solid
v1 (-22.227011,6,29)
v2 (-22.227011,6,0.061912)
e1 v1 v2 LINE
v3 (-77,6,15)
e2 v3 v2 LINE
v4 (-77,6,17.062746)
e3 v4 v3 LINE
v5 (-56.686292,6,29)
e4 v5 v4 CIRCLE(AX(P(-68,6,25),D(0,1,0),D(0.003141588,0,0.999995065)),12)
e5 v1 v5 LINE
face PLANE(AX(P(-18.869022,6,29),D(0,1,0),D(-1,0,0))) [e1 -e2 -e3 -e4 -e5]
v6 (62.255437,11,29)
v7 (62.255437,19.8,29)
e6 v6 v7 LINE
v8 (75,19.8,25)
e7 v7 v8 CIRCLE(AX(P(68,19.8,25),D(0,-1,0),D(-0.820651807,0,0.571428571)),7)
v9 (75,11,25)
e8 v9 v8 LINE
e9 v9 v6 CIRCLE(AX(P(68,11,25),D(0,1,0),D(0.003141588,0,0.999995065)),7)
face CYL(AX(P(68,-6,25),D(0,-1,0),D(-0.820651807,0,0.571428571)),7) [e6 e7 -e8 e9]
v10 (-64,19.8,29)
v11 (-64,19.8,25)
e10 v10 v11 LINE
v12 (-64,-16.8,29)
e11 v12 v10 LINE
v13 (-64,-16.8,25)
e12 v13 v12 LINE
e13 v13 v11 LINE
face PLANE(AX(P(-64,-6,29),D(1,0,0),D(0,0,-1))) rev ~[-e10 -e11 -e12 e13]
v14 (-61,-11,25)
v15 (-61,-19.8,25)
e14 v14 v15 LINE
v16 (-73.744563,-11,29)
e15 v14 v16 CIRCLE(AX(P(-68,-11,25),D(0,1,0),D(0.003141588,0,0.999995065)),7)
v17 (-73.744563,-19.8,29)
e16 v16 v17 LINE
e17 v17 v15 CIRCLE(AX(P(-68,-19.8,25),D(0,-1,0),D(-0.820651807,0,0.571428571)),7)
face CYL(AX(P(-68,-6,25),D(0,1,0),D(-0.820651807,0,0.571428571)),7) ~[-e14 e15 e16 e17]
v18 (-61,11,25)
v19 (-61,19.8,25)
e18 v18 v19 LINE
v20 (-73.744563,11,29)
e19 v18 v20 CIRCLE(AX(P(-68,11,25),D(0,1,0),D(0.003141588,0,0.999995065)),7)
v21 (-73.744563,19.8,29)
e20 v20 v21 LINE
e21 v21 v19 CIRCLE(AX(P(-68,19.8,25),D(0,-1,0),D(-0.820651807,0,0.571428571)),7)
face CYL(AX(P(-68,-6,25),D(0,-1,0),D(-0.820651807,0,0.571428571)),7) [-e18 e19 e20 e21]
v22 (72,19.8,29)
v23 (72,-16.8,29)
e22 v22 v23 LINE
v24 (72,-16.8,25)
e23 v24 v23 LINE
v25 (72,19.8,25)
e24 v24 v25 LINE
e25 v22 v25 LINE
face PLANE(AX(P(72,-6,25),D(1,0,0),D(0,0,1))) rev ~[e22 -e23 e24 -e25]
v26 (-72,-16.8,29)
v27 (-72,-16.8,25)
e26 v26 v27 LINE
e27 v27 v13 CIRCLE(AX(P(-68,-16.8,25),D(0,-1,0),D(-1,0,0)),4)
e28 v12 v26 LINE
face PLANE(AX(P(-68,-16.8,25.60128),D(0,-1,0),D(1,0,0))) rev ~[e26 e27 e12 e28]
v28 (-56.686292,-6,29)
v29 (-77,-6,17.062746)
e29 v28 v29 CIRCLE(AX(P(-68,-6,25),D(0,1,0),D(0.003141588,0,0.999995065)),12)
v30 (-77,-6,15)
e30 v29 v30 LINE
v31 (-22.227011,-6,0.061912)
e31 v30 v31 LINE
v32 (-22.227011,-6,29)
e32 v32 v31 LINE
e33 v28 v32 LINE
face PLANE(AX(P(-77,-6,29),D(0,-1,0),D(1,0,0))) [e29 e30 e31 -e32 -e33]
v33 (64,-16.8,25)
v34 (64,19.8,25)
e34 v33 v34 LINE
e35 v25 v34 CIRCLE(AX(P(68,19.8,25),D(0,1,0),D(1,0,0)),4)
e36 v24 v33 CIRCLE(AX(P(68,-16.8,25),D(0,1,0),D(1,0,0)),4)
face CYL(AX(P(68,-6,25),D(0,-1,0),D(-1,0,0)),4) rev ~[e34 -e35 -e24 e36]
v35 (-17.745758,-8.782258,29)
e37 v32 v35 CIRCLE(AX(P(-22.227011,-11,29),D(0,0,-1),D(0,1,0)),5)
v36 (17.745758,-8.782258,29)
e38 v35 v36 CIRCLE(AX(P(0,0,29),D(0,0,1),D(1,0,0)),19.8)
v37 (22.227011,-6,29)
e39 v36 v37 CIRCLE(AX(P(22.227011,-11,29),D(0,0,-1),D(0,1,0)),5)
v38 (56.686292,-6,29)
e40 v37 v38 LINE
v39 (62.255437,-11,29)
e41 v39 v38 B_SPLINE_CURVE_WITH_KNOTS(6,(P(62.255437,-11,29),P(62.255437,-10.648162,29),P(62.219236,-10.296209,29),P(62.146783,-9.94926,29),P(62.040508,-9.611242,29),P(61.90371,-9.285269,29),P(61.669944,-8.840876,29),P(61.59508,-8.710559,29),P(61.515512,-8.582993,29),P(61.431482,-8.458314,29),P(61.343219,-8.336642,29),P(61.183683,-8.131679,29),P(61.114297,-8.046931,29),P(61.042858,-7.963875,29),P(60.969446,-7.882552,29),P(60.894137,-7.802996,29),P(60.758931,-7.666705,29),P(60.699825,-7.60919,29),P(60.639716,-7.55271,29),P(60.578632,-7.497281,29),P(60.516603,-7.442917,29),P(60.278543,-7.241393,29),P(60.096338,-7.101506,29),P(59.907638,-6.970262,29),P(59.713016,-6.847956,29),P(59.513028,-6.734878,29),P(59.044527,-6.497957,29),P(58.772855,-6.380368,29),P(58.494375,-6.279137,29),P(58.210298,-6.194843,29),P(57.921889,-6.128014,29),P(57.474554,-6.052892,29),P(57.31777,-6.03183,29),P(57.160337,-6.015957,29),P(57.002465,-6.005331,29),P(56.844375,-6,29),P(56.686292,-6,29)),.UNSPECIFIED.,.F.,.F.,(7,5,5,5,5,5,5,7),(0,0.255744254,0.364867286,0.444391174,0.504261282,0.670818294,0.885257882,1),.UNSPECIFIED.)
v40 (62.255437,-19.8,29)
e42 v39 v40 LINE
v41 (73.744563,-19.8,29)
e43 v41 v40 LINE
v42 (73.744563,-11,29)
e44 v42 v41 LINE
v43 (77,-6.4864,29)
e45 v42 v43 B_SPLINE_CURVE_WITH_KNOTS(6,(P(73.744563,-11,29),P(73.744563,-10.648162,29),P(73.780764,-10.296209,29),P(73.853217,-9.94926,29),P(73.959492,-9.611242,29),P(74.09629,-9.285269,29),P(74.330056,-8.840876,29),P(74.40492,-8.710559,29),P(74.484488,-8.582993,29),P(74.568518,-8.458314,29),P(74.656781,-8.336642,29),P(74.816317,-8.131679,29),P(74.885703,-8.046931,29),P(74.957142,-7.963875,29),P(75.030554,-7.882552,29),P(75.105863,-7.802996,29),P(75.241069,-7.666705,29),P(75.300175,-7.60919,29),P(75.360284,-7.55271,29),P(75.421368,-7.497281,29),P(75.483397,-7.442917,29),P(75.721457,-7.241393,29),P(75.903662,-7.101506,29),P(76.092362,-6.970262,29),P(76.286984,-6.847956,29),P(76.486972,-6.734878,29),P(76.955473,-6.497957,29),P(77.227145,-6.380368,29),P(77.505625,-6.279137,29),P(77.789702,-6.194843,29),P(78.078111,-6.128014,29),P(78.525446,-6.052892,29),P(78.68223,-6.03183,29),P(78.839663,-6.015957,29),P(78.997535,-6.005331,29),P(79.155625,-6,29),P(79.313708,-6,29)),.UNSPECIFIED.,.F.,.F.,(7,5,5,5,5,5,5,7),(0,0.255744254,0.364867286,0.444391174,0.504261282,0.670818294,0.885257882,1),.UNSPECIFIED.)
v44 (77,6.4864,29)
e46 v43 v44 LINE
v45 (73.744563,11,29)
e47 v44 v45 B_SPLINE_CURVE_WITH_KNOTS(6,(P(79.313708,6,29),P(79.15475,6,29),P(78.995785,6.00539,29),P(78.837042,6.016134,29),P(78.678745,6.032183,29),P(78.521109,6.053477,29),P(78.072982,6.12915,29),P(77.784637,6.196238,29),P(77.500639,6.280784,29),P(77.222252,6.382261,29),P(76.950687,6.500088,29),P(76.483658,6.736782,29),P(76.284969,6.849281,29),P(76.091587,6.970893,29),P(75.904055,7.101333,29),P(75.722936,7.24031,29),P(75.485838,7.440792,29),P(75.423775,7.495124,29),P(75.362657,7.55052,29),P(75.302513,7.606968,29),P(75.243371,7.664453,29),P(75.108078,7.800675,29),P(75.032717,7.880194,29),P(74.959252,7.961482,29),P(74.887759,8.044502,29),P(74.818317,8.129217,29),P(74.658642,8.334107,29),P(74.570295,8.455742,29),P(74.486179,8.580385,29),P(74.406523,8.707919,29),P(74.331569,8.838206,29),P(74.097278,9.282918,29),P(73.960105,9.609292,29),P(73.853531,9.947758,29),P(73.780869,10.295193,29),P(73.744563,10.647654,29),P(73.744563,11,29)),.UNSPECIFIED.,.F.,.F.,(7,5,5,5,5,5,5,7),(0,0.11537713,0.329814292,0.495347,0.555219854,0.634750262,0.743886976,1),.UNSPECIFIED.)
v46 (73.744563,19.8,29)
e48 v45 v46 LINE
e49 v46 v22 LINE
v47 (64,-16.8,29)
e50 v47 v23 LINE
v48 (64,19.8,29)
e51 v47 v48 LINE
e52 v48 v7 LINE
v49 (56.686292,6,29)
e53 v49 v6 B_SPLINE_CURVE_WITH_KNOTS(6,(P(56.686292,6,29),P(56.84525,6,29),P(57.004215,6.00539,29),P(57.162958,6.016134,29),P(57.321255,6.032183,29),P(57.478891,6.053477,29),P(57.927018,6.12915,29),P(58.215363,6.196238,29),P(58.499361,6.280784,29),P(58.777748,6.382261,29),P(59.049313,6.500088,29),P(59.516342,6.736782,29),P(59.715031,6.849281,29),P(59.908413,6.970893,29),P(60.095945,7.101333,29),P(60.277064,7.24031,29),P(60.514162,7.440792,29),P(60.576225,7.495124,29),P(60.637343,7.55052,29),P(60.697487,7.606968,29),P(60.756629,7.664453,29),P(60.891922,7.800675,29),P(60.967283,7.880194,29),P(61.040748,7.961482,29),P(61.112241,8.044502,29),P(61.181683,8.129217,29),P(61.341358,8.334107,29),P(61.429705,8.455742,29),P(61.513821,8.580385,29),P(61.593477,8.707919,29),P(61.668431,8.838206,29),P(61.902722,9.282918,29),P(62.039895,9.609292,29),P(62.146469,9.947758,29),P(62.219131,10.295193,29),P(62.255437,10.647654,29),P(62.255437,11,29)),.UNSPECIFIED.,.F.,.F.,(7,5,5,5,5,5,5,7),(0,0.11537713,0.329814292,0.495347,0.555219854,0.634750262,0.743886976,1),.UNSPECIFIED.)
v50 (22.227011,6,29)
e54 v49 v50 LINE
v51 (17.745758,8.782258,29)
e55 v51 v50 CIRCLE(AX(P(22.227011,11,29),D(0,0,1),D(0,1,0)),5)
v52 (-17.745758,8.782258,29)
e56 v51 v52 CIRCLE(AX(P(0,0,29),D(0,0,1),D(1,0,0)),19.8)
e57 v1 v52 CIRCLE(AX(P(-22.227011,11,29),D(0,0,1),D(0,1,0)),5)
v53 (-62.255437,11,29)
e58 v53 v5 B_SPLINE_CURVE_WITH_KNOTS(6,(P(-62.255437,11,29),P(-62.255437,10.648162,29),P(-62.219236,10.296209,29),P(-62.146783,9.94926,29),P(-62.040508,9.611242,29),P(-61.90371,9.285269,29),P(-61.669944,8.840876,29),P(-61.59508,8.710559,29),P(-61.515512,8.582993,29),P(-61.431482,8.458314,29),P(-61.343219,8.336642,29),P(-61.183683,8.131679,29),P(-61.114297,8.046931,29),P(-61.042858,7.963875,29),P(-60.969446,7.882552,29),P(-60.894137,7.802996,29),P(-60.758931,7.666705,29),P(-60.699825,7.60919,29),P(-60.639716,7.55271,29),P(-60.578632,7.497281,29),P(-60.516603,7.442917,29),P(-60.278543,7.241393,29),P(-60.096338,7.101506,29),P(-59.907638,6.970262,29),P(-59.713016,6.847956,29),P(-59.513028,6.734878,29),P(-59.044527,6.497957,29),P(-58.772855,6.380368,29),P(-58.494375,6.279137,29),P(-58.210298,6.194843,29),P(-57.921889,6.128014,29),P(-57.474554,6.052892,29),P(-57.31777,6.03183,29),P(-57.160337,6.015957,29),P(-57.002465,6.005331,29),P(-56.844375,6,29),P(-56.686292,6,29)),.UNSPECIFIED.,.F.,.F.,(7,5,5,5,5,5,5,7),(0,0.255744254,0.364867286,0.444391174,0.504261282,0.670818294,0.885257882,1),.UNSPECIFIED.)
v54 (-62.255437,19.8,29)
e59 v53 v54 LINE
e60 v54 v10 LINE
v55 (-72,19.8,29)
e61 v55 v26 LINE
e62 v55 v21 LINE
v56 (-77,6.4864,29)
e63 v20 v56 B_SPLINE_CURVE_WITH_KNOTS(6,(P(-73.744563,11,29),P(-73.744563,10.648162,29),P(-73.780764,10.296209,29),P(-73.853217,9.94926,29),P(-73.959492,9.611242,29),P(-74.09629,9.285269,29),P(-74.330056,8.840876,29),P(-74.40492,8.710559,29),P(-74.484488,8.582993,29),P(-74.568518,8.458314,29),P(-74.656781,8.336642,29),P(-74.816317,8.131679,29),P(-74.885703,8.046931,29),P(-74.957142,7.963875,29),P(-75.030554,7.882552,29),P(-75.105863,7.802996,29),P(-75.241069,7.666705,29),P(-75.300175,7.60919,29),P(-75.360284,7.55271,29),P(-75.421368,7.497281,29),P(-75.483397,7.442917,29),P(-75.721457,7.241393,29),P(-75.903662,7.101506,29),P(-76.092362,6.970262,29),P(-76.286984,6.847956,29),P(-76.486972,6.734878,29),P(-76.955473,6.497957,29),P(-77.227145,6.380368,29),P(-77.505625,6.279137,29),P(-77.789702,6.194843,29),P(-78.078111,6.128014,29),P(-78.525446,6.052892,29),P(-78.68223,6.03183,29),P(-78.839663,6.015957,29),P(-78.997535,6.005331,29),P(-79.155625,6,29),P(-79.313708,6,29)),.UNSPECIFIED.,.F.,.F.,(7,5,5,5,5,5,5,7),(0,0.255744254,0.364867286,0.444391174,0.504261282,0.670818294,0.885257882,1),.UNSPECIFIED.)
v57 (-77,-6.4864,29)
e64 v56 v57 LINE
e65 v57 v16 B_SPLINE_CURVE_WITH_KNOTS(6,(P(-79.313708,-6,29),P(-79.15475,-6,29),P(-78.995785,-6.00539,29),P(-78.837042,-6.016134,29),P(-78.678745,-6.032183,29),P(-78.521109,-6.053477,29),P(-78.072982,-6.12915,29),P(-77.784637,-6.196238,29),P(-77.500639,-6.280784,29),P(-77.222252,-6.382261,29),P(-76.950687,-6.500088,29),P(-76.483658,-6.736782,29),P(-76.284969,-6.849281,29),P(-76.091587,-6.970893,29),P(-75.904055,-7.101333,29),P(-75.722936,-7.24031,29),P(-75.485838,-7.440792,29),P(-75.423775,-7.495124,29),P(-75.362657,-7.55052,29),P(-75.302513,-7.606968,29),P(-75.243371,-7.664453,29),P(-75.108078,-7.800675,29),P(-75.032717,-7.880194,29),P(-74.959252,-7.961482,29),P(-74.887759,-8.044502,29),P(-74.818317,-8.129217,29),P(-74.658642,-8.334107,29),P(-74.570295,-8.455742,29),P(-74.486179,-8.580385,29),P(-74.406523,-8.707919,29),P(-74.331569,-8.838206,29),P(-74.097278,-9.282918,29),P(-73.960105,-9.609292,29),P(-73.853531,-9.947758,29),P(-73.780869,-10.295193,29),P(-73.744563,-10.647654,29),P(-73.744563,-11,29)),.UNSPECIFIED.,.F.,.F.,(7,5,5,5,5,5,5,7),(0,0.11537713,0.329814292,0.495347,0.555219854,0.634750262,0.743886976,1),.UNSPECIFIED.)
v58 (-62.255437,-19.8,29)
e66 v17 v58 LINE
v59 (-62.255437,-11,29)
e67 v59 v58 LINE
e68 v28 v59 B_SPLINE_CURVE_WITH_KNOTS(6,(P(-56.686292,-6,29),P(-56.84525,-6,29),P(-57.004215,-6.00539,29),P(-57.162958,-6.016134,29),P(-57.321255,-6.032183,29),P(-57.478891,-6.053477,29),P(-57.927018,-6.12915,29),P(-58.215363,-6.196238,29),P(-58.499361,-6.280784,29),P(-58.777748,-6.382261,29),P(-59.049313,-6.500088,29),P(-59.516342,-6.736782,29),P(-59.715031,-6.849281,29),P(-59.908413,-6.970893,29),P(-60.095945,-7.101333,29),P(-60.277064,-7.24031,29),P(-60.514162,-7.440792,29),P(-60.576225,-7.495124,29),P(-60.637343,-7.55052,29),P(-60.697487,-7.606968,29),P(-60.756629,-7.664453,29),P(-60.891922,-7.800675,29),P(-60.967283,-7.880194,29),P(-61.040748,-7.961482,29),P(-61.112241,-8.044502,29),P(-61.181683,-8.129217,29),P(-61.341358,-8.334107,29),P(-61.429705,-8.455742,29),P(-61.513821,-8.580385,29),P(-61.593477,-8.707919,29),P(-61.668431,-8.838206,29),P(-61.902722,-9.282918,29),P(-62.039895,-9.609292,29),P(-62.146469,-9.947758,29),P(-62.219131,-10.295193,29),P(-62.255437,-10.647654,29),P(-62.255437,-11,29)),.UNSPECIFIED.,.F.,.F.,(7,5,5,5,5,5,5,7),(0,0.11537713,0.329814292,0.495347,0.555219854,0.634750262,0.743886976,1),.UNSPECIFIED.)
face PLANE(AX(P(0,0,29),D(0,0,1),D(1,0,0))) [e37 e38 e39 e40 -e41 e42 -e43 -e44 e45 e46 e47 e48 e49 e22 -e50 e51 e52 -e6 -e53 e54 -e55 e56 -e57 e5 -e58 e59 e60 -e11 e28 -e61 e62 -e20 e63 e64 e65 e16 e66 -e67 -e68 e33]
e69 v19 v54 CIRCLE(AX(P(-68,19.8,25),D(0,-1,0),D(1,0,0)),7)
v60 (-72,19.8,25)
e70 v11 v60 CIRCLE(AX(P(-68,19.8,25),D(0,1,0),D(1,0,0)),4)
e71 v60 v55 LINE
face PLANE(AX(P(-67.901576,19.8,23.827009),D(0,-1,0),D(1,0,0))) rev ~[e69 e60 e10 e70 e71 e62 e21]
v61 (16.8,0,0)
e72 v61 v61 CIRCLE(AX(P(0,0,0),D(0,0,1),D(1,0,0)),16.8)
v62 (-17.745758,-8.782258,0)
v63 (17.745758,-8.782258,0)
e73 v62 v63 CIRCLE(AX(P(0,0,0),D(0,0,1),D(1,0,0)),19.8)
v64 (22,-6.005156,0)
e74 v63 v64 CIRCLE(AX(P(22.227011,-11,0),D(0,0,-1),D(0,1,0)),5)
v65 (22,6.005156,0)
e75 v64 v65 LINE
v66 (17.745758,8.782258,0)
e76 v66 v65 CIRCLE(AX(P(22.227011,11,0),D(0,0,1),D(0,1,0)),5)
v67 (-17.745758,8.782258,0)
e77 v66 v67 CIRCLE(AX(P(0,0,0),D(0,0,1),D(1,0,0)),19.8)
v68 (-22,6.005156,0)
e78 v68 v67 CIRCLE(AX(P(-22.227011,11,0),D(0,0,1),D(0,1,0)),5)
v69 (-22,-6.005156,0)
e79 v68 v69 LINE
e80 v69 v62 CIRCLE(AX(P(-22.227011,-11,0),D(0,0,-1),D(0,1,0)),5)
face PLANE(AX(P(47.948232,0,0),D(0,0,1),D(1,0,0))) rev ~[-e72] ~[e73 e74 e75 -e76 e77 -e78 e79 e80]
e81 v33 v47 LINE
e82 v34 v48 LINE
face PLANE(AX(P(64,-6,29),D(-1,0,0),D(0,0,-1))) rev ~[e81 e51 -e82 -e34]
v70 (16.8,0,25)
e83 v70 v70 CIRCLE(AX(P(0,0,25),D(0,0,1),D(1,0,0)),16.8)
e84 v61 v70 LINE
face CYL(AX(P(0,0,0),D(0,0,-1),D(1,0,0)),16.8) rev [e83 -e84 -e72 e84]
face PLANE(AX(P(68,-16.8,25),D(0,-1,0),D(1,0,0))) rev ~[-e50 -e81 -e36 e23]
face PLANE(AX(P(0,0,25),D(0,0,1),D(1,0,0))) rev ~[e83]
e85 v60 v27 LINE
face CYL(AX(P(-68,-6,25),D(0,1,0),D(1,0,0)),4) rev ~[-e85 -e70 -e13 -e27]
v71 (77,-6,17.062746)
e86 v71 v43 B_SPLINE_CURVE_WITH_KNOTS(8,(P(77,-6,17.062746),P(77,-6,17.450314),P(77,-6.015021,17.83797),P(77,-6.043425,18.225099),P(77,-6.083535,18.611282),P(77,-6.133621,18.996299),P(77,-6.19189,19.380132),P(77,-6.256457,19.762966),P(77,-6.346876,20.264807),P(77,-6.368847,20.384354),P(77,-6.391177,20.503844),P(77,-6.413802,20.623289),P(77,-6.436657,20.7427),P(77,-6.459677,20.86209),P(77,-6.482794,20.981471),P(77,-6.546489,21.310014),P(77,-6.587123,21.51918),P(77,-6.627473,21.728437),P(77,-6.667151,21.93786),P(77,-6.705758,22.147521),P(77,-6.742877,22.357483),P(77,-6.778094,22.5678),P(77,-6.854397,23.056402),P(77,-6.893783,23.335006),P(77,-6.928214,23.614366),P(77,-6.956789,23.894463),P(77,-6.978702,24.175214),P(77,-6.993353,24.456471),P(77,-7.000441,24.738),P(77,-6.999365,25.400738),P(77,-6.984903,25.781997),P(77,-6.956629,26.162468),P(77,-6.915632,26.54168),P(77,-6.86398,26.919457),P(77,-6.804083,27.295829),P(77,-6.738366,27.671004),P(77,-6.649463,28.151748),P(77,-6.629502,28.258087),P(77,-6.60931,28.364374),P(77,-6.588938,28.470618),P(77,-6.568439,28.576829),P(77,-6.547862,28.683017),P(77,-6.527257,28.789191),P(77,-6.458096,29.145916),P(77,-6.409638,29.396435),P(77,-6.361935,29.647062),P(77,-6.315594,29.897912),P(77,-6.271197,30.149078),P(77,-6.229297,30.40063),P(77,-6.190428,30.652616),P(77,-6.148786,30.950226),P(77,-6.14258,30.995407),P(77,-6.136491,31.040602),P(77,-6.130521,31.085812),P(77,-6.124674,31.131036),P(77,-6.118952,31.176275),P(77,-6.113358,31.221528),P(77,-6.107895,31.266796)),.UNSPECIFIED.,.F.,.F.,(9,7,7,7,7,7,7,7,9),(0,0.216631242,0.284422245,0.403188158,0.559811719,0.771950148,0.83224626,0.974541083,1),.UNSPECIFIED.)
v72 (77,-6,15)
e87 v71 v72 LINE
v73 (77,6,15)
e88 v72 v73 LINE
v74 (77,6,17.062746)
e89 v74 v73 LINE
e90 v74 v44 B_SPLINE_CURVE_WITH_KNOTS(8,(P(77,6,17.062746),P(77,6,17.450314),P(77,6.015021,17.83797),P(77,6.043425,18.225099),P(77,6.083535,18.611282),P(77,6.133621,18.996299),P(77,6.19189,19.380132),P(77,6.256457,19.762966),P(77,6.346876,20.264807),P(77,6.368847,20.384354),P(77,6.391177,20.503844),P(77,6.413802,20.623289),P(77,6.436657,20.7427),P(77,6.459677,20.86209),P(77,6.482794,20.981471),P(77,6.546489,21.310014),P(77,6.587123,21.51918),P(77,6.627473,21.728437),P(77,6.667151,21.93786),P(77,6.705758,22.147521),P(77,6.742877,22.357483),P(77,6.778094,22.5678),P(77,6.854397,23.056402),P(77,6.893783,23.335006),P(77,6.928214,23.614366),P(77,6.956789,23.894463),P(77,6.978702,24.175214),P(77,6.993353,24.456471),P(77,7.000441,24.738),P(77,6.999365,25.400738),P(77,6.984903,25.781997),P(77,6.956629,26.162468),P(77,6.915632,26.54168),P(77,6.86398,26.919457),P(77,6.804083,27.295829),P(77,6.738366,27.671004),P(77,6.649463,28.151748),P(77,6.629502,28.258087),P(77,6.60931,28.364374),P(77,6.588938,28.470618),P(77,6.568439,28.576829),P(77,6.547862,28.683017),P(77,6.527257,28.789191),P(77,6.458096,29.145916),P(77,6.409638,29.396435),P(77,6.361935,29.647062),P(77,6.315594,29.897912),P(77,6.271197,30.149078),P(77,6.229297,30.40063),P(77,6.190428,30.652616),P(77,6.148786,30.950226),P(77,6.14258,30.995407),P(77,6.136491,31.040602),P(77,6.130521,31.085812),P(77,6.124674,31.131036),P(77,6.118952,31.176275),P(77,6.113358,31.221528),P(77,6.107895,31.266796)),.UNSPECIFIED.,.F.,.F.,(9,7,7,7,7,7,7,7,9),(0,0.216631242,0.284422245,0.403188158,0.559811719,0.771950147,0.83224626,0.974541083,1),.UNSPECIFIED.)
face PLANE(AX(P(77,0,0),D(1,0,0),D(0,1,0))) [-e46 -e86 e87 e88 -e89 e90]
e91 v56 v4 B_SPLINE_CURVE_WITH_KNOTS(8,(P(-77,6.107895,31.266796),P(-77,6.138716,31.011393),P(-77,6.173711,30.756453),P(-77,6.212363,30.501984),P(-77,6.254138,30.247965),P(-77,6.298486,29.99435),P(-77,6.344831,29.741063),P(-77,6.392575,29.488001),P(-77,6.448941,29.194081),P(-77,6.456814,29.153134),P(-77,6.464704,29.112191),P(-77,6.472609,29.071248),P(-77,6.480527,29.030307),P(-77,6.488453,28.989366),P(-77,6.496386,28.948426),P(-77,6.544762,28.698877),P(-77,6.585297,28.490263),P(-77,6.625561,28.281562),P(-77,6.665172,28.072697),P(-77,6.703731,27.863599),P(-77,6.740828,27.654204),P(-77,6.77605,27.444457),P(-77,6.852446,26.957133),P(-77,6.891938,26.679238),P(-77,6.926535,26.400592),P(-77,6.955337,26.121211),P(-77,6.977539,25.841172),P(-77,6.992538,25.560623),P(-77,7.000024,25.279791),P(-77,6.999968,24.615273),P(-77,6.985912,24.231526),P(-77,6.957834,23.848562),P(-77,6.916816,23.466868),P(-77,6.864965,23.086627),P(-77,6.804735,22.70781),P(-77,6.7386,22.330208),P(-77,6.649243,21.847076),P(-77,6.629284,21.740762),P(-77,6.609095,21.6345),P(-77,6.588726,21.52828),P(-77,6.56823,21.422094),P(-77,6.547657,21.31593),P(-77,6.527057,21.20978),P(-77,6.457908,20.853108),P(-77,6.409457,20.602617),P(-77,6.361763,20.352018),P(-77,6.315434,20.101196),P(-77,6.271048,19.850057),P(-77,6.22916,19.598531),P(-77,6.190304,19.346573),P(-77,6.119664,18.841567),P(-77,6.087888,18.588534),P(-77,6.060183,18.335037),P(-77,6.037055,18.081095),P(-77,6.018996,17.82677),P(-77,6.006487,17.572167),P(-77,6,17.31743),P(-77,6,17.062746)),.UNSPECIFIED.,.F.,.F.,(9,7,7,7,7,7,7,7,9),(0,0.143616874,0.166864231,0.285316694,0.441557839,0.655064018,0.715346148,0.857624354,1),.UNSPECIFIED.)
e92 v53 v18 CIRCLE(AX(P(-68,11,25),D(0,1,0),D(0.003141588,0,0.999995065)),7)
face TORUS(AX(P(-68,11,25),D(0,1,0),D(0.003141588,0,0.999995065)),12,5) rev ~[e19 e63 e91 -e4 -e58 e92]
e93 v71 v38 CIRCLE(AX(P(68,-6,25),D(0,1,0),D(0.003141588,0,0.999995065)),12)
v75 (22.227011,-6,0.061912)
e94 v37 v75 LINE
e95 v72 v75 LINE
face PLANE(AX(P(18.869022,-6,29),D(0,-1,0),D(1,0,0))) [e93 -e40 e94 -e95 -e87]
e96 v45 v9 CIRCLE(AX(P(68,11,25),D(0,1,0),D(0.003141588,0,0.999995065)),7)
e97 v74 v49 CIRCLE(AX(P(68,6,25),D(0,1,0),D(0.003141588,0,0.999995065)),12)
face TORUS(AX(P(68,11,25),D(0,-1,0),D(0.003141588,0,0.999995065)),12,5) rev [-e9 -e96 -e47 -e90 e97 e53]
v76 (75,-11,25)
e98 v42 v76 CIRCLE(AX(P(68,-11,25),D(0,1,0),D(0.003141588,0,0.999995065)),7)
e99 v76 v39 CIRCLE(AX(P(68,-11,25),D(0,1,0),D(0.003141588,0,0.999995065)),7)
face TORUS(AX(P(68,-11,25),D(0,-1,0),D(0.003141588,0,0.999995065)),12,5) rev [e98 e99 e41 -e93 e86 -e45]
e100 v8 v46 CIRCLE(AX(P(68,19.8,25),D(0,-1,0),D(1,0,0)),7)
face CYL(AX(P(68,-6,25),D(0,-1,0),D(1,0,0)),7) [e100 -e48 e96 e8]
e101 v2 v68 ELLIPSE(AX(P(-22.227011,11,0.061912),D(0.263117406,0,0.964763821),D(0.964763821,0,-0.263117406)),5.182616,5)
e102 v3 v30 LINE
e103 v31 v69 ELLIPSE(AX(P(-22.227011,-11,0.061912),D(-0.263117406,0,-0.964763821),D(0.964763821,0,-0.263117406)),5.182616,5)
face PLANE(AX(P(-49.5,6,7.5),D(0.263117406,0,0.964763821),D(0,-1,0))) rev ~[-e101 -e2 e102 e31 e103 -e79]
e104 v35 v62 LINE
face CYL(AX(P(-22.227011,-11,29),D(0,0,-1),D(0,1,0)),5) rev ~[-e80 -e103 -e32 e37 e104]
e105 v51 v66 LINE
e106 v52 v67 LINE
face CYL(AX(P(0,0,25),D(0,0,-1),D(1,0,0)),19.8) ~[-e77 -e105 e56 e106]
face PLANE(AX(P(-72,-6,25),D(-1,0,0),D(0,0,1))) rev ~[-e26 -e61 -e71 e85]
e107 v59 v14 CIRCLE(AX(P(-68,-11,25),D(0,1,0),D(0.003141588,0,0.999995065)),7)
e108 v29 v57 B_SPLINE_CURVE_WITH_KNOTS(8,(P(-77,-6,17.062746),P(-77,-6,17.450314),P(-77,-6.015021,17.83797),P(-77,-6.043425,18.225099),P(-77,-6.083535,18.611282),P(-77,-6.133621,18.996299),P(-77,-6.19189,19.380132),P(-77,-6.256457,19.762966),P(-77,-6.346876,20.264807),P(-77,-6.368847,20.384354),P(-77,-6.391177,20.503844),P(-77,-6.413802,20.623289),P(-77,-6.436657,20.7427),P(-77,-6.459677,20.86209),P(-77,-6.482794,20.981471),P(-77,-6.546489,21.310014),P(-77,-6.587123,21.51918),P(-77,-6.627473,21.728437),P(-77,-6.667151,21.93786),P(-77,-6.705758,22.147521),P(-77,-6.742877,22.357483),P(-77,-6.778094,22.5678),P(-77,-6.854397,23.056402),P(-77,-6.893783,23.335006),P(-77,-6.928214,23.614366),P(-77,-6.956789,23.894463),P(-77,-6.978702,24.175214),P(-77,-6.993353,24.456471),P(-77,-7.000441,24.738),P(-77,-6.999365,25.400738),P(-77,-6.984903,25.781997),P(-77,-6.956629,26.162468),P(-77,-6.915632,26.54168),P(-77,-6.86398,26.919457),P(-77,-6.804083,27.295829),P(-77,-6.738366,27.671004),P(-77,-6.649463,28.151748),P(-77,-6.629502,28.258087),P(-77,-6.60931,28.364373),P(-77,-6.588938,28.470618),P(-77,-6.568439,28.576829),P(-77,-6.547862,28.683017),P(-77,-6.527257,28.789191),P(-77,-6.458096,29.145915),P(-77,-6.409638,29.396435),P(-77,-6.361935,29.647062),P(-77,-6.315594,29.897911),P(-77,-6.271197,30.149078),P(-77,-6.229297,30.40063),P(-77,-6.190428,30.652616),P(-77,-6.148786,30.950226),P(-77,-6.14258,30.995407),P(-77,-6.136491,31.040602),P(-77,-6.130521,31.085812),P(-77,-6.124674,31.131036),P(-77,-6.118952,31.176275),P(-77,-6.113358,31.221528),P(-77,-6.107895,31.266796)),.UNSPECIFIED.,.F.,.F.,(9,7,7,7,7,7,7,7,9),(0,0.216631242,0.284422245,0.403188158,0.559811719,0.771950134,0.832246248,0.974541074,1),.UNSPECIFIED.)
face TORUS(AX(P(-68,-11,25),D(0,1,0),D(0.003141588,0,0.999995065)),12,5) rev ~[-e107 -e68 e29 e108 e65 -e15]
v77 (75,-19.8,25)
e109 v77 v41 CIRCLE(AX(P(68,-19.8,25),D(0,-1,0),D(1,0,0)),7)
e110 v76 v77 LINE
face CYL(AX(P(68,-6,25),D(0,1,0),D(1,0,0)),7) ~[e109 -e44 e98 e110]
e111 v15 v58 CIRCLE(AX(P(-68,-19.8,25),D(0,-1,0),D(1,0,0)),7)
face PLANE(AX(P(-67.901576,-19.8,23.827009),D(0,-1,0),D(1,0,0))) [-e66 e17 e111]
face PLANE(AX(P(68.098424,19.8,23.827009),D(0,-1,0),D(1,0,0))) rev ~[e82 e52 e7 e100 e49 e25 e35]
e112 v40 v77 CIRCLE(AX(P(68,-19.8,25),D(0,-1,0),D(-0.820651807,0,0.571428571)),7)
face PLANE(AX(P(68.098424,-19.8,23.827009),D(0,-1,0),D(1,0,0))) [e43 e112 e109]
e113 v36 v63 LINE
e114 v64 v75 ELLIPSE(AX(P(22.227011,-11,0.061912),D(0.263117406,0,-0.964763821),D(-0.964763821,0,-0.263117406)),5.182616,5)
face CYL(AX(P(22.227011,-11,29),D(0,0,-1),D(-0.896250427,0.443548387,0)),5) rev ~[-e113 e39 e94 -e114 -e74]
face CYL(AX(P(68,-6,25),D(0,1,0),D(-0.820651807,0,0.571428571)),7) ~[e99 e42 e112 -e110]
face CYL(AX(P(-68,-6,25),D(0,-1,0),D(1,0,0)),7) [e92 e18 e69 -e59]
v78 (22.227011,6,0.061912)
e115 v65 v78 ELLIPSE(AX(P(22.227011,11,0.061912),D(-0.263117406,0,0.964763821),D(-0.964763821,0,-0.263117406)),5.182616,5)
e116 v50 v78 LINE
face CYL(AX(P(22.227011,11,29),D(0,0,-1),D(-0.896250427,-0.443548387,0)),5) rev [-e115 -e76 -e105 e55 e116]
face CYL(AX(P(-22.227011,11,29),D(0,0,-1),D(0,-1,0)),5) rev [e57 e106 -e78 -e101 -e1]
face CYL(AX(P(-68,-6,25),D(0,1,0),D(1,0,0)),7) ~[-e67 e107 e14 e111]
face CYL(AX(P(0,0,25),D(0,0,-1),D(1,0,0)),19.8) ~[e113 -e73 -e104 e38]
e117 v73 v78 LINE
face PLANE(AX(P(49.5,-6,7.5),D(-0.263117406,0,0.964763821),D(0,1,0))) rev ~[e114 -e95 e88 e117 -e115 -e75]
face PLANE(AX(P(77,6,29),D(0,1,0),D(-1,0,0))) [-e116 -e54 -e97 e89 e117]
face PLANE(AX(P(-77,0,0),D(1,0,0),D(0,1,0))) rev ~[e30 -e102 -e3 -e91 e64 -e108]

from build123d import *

# Parameters (mm, degrees)
F0_R           = 19.8
F0_R_2         = 16.8
F1_DEPTH       = 25
F2_R           = 19.8
F2_R_2         = 16.8
F3_DEPTH       = 4
F5_DEPTH       = 29
F6_SIZE2       = 55
F6_SIZE        = 15
F6_2_SIZE2     = 55
F6_2_SIZE      = 15
F7_R           = 5
F9_DEPTH       = 25
F10_DEPTH      = 13.8
F10_DEPTH_BACK = 25.8
F11_T4_ANGLE   = 359.64
F11_T10_ANGLE  = 359.64
F11_T16_ANGLE  = 359.64
F11_T22_ANGLE  = 359.64
F12_W          = 8
F12_H          = 8
F13_DEPTH      = 3


# Not quite as in the source:
# - a fillet or chamfer that OpenCascade refuses, or shapes differently, is made with other operations: its cross-section is extruded or revolved along the edge and cut away or added


with BuildPart() as f1:
    # F0 (on Top) → F1 (new body)
    with BuildSketch(Plane.XY):
        Circle(F0_R)
        Circle(F0_R_2, mode=Mode.SUBTRACT)
    extrude(amount=F1_DEPTH)

    # F2 (on face) → F3 (join)
    with BuildSketch(Plane.XY.offset(25)):
        Circle(F2_R)
        Circle(F2_R_2, mode=Mode.SUBTRACT)
        Circle(F2_R_2)
    extrude(amount=F3_DEPTH)

    # F4 (on face) → F5 (join)
    with BuildSketch(Plane.XY.offset(29)):
        with BuildLine():
            Line((-77, -6), (-18.8690222322, -6))
            ThreePointArc((-18.8690222322, -6), (-19.8, 0), (-18.8690222322, 6))
            Line((-18.8690222322, 6), (-77, 6))
            Line((-77, 6), (-77, -6))
        make_face()
        with BuildLine():
            Line((18.8690222322, -6), (77, -6))
            Line((77, -6), (77, 6))
            Line((77, 6), (18.8690222322, 6))
            ThreePointArc((18.8690222322, 6), (19.5658713095, 3.0358985327), (19.8, 0))
            ThreePointArc((19.8, 0), (19.5658713095, -3.0358985327), (18.8690222322, -6))
        make_face()
    extrude(amount=-F5_DEPTH)

    # F6
    f6_edges = [f1.edges().sort_by_distance(p)[0] for p in [
        (77, 0, 0),
    ]]
    f6_side = f1.faces().sort_by_distance((77, 0, 14.5))[0]
    chamfer(f6_edges, length=F6_SIZE, length2=F6_SIZE2, reference=f6_side)

    # F6#2
    f6_2_edges = [f1.edges().sort_by_distance(p)[0] for p in [
        (-77, 0, 0),
    ]]
    f6_2_side = f1.faces().sort_by_distance((-77, 0, 14.5))[0]
    chamfer(f6_2_edges, length=F6_2_SIZE, length2=F6_2_SIZE2, reference=f6_2_side)

    # F7 (call 1 of 4: OpenCascade refuses the feature's edges together)
    f7_edges = [f1.edges().sort_by_distance(p)[0] for p in [
        (-18.869022, 6, 14.5),
    ]]
    fillet(f7_edges, radius=F7_R)

    # F7#2 (call 2 of 4)
    f7_2_edges = [f1.edges().sort_by_distance(p)[0] for p in [
        (18.869022, 6, 14.5),
    ]]
    fillet(f7_2_edges, radius=F7_R)

    # F7#3 (call 3 of 4)
    f7_3_edges = [f1.edges().sort_by_distance(p)[0] for p in [
        (-18.869022, -6, 14.5),
    ]]
    fillet(f7_3_edges, radius=F7_R)

    # F7#4 (call 4 of 4)
    f7_4_edges = [f1.edges().sort_by_distance(p)[0] for p in [
        (18.869022, -6, 14.5),
    ]]
    fillet(f7_4_edges, radius=F7_R)

    # F8 (on face) → F9 (cut)
    with BuildSketch(Plane.XZ.offset(6)):
        with BuildLine():
            ThreePointArc((68, 29), (70.8284271247, 27.8284271247), (72, 25))
            Line((72, 25), (72, 29))
            Line((72, 29), (68, 29))
        make_face()
        with BuildLine():
            Line((64, 29), (64, 25))
            ThreePointArc((64, 25), (65.1715728753, 27.8284271247), (68, 29))
            Line((68, 29), (64, 29))
        make_face()
        with BuildLine():
            ThreePointArc((68, 29), (65.1715728753, 27.8284271247), (64, 25))
            ThreePointArc((64, 25), (68, 21), (72, 25))
            ThreePointArc((72, 25), (70.8284271247, 27.8284271247), (68, 29))
        make_face()
        with BuildLine():
            Line((-72, 29), (-72, 25))
            ThreePointArc((-72, 25), (-70.8284271247, 27.8284271247), (-68, 29))
            Line((-68, 29), (-72, 29))
        make_face()
        with BuildLine():
            ThreePointArc((-68, 29), (-65.1715728753, 27.8284271247), (-64, 25))
            Line((-64, 25), (-64, 29))
            Line((-64, 29), (-68, 29))
        make_face()
        with BuildLine():
            ThreePointArc((-68, 29), (-70.8284271247, 27.8284271247), (-72, 25))
            ThreePointArc((-72, 25), (-68, 21), (-64, 25))
            ThreePointArc((-64, 25), (-65.1715728753, 27.8284271247), (-68, 29))
        make_face()
    extrude(amount=-F9_DEPTH, mode=Mode.SUBTRACT)

    # F8 (on face) → F10 (join, two sides)
    with BuildSketch(Plane.XZ.offset(6)) as f10_sk:
        with BuildLine():
            ThreePointArc((-64, 25), (-68, 21), (-72, 25))
            Line((-72, 25), (-72, 29))
            Line((-72, 29), (-73.7445626465, 29))
            ThreePointArc((-73.7445626465, 29), (-70.0961943462, 18.3212299588), (-61, 25))
            ThreePointArc((-61, 25), (-61.3212299588, 27.0961943462), (-62.2554373535, 29))
            Line((-62.2554373535, 29), (-64, 29))
            Line((-64, 29), (-64, 25))
        make_face()
        with BuildLine():
            ThreePointArc((72, 25), (68, 21), (64, 25))
            Line((64, 25), (64, 29))
            Line((64, 29), (62.2554373535, 29))
            ThreePointArc((62.2554373535, 29), (65.9038056538, 18.3212299588), (75, 25))
            ThreePointArc((75, 25), (74.6787700412, 27.0961943462), (73.7445626465, 29))
            Line((73.7445626465, 29), (72, 29))
            Line((72, 29), (72, 25))
        make_face()
    extrude(amount=F10_DEPTH)
    extrude(f10_sk.sketch, amount=-F10_DEPTH_BACK)

    # F11: fillet of radius 5 on 4 edges, made by hand


with BuildPart() as f11_tool2:
    # F11_s3 → F11_t4 (revolve)
    with BuildSketch(Plane(origin=(67.9207895695, 0, -0.2133801555), x_dir=(0, 1, 0), z_dir=(-0.9999950652, 0, 0.0031415875))):
        with BuildLine():
            ThreePointArc((6, -37.2135045791), (7.4644660941, -33.6779706732), (11, -32.2135045791))
            Line((11, -32.2135045791), (6, -32.2135045791))
            Line((6, -32.2135045791), (6, -37.2135045791))
        make_face()
    revolve(axis=Axis((68, 6, 25), (0, 1, 0)), revolution_arc=F11_T4_ANGLE)

    split(bisect_by=Plane.XY.offset(29), keep=Keep.BOTTOM)

    split(bisect_by=Plane.YZ.offset(77), keep=Keep.BOTTOM)


with BuildPart() as f1_1:
    add(f1.part)

    # F11_t1: union F11_tool2
    add(f11_tool2.part)


with BuildPart() as f11_tool8:
    # F11_s9 → F11_t10 (revolve)
    with BuildSketch(Plane(origin=(67.9207895695, 0, -0.2133801555), x_dir=(0, 1, 0), z_dir=(-0.9999950652, 0, 0.0031415875))):
        with BuildLine():
            ThreePointArc((-11, -32.2135045791), (-7.4644660941, -33.6779706732), (-6, -37.2135045791))
            Line((-6, -37.2135045791), (-6, -32.2135045791))
            Line((-6, -32.2135045791), (-11, -32.2135045791))
        make_face()
    revolve(axis=Axis((68, -6, 25), (0, 1, 0)), revolution_arc=F11_T10_ANGLE)

    split(bisect_by=Plane.XY.offset(29), keep=Keep.BOTTOM)

    split(bisect_by=Plane.YZ.offset(77), keep=Keep.BOTTOM)


with BuildPart() as f1_2:
    add(f1_1.part)

    # F11_t7: union F11_tool8
    add(f11_tool8.part)


with BuildPart() as f11_tool14:
    # F11_s15 → F11_t16 (revolve)
    with BuildSketch(Plane(origin=(-68.0778681687, 0, 0.2138736341), x_dir=(0, 1, 0), z_dir=(-0.9999950652, 0, 0.0031415875))):
        with BuildLine():
            ThreePointArc((11, -31.786248681), (7.4644660941, -33.2507147751), (6, -36.786248681))
            Line((6, -36.786248681), (6, -31.786248681))
            Line((6, -31.786248681), (11, -31.786248681))
        make_face()
    revolve(axis=Axis((-68, 6, 25), (0, 1, 0)), revolution_arc=F11_T16_ANGLE)

    split(bisect_by=Plane.XY.offset(29), keep=Keep.BOTTOM)

    split(bisect_by=Plane.YZ.offset(-77), keep=Keep.TOP)


with BuildPart() as f1_3:
    add(f1_2.part)

    # F11_t13: union F11_tool14
    add(f11_tool14.part)


with BuildPart() as f11_tool20:
    # F11_s21 → F11_t22 (revolve)
    with BuildSketch(Plane(origin=(-68.0778681687, 0, 0.2138736341), x_dir=(0, 1, 0), z_dir=(-0.9999950652, 0, 0.0031415875))):
        with BuildLine():
            ThreePointArc((-6, -36.786248681), (-7.4644660941, -33.2507147751), (-11, -31.786248681))
            Line((-11, -31.786248681), (-6, -31.786248681))
            Line((-6, -31.786248681), (-6, -36.786248681))
        make_face()
    revolve(axis=Axis((-68, -6, 25), (0, 1, 0)), revolution_arc=F11_T22_ANGLE)

    split(bisect_by=Plane.XY.offset(29), keep=Keep.BOTTOM)

    split(bisect_by=Plane.YZ.offset(-77), keep=Keep.TOP)


with BuildPart() as f1_4:
    add(f1_3.part)

    # F11_t19: union F11_tool20
    add(f11_tool20.part)

    # F12 (on face) → F13 (join)
    with BuildSketch(Plane.XZ.offset(19.8)):
        with Locations((68, 25)):
            Rectangle(F12_W, F12_H)
        with BuildLine():
            Line((-64, 29), (-72, 29))
            Line((-72, 29), (-72, 25))
            ThreePointArc((-72, 25), (-70.8284271247, 22.1715728753), (-68, 21))
            ThreePointArc((-68, 21), (-65.1715728753, 22.1715728753), (-64, 25))
            Line((-64, 25), (-64, 29))
        make_face()
        with BuildLine():
            Line((-64, 21), (-64, 25))
            ThreePointArc((-64, 25), (-65.1715728753, 22.1715728753), (-68, 21))
            Line((-68, 21), (-64, 21))
        make_face()
        with BuildLine():
            ThreePointArc((-68, 21), (-70.8284271247, 22.1715728753), (-72, 25))
            Line((-72, 25), (-72, 21))
            Line((-72, 21), (-68, 21))
        make_face()
    extrude(amount=-F13_DEPTH)


solid = f1_4.part
